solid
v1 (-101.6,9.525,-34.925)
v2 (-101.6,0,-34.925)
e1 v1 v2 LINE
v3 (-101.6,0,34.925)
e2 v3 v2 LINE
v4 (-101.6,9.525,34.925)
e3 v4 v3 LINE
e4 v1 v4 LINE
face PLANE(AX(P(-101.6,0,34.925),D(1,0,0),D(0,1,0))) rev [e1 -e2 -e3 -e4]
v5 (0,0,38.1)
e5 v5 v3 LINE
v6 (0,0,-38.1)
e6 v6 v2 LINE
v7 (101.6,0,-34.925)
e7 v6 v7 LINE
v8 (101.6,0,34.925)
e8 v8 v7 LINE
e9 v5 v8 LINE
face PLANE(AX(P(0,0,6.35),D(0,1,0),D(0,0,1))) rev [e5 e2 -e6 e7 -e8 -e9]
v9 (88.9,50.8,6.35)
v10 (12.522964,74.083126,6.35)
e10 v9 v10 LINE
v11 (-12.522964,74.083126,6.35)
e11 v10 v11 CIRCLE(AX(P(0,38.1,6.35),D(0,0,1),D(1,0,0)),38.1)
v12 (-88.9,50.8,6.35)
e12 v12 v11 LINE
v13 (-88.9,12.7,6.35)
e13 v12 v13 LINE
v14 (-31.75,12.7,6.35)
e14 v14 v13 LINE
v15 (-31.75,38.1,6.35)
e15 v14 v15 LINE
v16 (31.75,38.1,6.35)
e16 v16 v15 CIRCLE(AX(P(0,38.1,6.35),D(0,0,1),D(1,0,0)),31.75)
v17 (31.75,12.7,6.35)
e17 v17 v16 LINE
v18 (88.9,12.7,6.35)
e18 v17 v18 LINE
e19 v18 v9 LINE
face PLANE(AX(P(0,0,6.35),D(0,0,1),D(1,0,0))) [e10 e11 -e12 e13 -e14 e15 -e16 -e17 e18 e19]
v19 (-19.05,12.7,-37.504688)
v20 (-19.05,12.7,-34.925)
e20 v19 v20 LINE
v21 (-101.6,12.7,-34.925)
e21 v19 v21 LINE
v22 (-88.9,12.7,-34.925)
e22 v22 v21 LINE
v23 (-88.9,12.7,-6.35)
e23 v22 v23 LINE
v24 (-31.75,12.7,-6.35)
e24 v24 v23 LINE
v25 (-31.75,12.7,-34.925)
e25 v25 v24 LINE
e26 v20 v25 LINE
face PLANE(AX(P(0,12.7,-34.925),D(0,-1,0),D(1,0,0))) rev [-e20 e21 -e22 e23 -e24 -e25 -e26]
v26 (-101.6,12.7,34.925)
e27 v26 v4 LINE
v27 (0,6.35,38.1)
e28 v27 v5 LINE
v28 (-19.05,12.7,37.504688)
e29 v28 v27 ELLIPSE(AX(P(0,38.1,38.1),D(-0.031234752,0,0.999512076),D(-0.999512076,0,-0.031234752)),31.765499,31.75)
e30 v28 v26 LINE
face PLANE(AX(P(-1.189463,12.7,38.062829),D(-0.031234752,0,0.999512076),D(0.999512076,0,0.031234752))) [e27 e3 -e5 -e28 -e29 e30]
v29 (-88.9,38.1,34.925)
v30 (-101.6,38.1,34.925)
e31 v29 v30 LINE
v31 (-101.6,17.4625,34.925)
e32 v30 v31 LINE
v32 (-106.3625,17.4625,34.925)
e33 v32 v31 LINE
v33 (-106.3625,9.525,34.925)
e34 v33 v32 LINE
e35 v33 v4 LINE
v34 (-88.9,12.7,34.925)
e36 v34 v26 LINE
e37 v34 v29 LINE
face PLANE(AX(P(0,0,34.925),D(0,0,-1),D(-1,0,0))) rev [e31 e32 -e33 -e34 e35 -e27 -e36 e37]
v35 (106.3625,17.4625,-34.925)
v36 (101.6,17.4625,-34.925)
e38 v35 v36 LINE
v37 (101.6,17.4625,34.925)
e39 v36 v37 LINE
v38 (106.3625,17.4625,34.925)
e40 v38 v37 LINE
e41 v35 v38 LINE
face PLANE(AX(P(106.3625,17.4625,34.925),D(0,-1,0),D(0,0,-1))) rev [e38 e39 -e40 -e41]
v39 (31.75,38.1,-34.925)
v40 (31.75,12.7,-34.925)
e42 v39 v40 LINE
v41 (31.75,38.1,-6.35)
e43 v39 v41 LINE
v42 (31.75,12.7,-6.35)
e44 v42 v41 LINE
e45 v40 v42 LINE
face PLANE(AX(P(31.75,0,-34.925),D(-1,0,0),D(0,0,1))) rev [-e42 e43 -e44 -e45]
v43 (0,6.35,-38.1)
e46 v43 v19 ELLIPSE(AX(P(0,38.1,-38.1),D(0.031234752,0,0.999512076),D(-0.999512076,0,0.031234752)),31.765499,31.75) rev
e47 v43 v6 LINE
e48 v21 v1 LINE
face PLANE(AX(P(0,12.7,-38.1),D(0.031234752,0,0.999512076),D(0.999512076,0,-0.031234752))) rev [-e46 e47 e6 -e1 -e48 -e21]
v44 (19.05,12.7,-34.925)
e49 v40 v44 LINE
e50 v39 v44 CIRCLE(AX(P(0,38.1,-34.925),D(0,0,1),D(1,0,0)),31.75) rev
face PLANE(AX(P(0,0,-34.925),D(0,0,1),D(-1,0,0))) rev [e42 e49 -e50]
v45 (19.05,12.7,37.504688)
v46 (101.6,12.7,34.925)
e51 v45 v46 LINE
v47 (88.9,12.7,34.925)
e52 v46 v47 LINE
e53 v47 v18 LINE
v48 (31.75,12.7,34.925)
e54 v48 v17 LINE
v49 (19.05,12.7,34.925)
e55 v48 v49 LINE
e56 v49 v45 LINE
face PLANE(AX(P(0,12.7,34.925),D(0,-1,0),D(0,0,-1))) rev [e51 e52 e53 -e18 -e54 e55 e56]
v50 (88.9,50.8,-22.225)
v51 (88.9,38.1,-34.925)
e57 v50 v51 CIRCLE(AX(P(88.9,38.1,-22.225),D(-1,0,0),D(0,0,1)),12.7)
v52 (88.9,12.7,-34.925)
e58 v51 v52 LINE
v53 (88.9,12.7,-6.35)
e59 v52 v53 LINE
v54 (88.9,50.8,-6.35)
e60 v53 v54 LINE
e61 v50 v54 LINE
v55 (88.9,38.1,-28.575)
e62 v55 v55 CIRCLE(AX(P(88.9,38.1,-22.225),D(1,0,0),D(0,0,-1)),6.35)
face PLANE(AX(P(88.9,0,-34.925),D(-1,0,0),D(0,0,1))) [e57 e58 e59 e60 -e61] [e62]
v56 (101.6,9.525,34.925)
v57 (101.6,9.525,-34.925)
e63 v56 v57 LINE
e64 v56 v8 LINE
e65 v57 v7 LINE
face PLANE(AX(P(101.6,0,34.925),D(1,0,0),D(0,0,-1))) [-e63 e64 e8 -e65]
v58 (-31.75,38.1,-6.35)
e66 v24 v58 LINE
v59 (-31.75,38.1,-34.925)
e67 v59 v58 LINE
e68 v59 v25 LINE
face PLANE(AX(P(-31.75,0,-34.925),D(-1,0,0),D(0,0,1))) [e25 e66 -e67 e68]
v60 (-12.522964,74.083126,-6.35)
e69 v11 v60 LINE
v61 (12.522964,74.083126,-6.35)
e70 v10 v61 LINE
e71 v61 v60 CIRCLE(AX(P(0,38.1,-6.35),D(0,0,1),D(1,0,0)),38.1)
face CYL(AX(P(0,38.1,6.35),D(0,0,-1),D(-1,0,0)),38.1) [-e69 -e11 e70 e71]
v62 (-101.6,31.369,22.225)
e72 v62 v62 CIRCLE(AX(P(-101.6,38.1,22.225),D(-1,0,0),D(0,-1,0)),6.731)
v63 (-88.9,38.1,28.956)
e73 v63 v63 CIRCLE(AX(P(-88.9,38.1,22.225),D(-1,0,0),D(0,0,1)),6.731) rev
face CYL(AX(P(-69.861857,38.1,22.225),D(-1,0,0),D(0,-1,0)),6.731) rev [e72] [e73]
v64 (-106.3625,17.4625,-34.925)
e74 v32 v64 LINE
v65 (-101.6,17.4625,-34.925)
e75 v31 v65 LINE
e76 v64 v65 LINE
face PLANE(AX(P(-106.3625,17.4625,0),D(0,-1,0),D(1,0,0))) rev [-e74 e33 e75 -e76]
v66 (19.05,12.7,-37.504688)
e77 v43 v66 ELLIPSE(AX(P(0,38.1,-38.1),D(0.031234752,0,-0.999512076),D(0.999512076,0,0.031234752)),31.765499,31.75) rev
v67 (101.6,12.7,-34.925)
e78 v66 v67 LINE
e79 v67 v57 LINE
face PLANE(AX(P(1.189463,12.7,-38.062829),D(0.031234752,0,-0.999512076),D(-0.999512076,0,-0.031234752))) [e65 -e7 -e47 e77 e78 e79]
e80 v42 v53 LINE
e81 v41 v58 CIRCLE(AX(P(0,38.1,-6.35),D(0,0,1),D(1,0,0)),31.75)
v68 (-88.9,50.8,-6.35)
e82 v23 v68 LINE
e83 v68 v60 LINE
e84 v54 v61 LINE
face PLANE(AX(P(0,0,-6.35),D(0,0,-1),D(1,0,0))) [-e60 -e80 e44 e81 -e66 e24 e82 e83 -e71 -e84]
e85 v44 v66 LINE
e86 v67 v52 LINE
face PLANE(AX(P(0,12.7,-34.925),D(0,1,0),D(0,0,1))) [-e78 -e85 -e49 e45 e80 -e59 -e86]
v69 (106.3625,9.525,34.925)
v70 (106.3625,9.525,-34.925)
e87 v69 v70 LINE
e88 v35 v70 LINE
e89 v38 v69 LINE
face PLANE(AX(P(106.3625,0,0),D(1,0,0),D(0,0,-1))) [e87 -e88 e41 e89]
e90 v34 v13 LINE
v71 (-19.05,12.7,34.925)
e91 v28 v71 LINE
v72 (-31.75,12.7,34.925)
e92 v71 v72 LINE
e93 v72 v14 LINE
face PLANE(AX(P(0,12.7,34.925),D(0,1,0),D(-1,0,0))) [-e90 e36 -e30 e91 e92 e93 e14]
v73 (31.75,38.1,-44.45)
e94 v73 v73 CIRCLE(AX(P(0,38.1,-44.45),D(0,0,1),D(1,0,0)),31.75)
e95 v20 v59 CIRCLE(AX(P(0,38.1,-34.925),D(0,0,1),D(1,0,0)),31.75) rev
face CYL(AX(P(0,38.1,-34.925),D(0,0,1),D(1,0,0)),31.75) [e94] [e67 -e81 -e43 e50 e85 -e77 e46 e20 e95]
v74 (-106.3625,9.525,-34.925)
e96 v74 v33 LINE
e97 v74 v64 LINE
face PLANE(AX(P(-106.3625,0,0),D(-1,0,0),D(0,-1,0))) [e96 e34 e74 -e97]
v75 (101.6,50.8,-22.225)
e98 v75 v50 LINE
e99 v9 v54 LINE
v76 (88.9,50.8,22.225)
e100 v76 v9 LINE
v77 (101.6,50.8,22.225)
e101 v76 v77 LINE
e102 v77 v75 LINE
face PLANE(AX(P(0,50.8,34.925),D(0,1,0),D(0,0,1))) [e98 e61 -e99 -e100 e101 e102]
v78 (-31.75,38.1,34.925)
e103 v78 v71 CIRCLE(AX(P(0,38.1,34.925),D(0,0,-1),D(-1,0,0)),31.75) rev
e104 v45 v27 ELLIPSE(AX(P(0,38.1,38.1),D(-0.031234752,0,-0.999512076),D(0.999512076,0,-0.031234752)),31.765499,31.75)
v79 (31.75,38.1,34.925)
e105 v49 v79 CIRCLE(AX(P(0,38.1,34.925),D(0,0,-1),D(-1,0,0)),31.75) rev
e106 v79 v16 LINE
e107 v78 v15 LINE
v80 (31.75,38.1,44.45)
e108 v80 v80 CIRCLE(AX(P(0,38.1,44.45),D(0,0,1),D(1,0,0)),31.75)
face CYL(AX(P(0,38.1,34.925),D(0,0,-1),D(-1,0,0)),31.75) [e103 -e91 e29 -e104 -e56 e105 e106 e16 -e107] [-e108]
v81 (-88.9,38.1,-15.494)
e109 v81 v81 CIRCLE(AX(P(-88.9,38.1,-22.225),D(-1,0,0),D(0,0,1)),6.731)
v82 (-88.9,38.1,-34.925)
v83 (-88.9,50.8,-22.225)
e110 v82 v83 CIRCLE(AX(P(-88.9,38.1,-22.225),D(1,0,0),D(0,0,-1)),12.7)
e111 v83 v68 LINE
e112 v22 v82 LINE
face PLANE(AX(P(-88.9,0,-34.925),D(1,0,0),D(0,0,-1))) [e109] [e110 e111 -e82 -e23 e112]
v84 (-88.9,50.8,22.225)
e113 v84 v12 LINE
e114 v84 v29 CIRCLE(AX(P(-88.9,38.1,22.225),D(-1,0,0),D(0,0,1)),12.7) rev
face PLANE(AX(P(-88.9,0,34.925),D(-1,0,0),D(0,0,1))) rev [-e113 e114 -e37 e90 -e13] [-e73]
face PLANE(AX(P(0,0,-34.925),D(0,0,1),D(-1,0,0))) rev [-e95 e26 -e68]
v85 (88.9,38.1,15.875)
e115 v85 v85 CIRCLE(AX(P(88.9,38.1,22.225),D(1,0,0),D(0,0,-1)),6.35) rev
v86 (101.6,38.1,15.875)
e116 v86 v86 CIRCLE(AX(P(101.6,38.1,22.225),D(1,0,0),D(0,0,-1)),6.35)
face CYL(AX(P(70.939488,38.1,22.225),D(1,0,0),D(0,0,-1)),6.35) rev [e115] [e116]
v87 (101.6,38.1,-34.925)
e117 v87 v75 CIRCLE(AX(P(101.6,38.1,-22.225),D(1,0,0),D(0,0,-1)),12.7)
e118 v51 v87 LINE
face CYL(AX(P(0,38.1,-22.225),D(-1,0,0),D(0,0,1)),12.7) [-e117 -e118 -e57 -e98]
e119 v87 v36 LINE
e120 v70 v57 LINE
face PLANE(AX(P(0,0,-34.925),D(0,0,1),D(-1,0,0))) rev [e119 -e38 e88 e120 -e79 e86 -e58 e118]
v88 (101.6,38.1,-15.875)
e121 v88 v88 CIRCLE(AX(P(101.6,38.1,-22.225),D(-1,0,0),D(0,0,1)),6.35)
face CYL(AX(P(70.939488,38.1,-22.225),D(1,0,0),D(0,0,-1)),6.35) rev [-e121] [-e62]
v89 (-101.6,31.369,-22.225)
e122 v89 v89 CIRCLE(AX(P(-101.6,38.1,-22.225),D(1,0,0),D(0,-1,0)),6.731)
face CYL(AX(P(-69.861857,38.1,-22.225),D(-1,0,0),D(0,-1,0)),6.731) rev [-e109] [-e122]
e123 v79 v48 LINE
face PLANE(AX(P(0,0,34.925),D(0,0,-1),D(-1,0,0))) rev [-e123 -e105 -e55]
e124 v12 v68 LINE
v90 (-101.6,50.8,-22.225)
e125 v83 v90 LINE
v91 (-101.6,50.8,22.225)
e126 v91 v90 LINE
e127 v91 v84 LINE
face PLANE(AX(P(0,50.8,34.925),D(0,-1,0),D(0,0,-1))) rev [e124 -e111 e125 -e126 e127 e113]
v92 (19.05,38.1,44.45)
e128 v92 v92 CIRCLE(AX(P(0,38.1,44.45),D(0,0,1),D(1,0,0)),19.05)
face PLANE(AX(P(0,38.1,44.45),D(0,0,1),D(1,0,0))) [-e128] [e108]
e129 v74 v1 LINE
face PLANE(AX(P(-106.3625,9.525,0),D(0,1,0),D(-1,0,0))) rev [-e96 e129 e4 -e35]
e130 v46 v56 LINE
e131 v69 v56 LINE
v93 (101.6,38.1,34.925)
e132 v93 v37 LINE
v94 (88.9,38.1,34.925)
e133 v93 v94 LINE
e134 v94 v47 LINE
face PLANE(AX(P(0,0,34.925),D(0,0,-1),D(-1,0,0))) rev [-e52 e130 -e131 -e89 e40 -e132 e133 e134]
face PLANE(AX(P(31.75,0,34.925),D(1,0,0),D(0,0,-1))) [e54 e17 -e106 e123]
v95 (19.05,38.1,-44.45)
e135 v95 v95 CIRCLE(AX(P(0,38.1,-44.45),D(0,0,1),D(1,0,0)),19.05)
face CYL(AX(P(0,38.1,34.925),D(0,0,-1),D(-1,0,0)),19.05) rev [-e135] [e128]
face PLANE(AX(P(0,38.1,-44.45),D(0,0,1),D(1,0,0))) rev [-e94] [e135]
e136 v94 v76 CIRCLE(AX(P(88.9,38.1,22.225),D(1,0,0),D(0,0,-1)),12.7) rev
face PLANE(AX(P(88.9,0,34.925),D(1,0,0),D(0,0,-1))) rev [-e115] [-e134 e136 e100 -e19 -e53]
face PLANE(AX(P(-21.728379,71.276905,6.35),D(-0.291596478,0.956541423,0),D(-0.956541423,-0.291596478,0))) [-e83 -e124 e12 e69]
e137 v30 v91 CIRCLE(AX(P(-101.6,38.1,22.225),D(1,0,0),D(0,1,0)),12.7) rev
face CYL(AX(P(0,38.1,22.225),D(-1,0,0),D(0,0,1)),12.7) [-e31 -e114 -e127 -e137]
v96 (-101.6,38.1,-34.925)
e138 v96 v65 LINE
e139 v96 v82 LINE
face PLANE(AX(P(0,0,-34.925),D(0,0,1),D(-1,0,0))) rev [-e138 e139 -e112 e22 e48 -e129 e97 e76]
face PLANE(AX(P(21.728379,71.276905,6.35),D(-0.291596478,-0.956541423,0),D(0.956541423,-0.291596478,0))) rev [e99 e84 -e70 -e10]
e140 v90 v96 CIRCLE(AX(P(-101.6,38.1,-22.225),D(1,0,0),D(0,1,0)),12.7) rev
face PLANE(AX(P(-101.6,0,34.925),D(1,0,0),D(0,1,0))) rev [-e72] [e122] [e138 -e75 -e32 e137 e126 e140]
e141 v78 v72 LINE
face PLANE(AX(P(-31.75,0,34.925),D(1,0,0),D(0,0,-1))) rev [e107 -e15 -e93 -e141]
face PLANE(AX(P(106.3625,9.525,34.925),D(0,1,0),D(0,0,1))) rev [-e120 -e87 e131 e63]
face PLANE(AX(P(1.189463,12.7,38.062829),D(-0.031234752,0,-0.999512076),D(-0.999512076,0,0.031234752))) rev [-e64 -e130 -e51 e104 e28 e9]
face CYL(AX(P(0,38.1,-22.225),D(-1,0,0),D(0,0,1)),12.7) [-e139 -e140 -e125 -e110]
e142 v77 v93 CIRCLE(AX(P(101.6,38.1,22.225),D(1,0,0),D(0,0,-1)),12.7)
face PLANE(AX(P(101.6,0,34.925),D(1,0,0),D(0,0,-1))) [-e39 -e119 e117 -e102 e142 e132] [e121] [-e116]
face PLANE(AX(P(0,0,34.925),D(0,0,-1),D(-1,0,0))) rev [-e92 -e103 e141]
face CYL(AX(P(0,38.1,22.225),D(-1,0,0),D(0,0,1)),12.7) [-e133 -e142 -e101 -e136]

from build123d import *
from build123d.topology import SkipClean

# Parameters (mm, degrees)
BOSS_EXTRUDE4_DEPTH     = 6.35
BOSS_EXTRUDE5_START     = -34.925
BOSS_EXTRUDE5_OUTLINE_R = 19.05
BOSS_EXTRUDE5_DEPTH     = 34.925
SKETCH5_R               = 6.35
CUT_EXTRUDE1_DEPTH      = 12.7
SKETCH6_R               = 6.731
CUT_EXTRUDE2_DEPTH      = 12.7
SKETCH8_W               = 34.925
SKETCH8_H               = 7.9375
BOSS_EXTRUDE6_DEPTH     = 4.7625
SKETCH9_W               = 34.925
SKETCH9_H               = 7.9375
BOSS_EXTRUDE7_DEPTH     = 4.7625
FILLET1_R               = 12.7
FILLET1_OF_MIRROR1_R    = 12.7
SKETCH10_R              = 31.75
SKETCH10_R_2            = 19.05
BOSS_EXTRUDE8_DEPTH     = 44.45
BOSS_EXTRUDE9_DEPTH     = 12.7


# Read off the part's stored shape, not the designer's step: Boss-Extrude5
with BuildPart() as part:
    # Sketch2 → Boss-Extrude4 (new body)
    with BuildSketch(Plane.XY):
        with BuildLine():
            ThreePointArc((-12.522963776, 74.083126299), (-37.56705413, 31.749689456), (0, 0))
            Line((0, 0), (0, 6.35))
            ThreePointArc((0, 6.35), (-31.75, 38.1), (0, 69.85))
            Line((0, 69.85), (0, 76.2))
            ThreePointArc((0, 76.2), (-6.350310544, 75.66705413), (-12.522963776, 74.083126299))
        make_face()
        with BuildLine():
            Line((0, 6.35), (0, 0))
            ThreePointArc((0, 0), (26.940768363, 11.159231637), (38.1, 38.1))
            ThreePointArc((38.1, 38.1), (31.054266373, 60.173571076), (12.522963776, 74.083126299))
            ThreePointArc((12.522963776, 74.083126299), (6.350310544, 75.66705413), (0, 76.2))
            Line((0, 76.2), (0, 69.85))
            ThreePointArc((0, 69.85), (22.450640303, 60.550640303), (31.75, 38.1))
            ThreePointArc((31.75, 38.1), (22.450640303, 15.649359697), (0, 6.35))
        make_face()
        with BuildLine():
            ThreePointArc((38.1, 38.1), (26.940768363, 11.159231637), (0, 0))
            Line((0, 0), (88.9, 0))
            Line((88.9, 0), (88.9, 50.8))
            Line((88.9, 50.8), (12.522963776, 74.083126299))
            ThreePointArc((12.522963776, 74.083126299), (31.054266373, 60.173571076), (38.1, 38.1))
        make_face()
        with BuildLine():
            Line((-88.9, 0), (0, 0))
            ThreePointArc((0, 0), (-37.56705413, 31.749689456), (-12.522963776, 74.083126299))
            Line((-12.522963776, 74.083126299), (-88.9, 50.8))
            Line((-88.9, 50.8), (-88.9, 0))
        make_face()
    boss_extrude4 = extrude(amount=BOSS_EXTRUDE4_DEPTH)

    # Boss-Extrude5 outline → Boss-Extrude5 (add)
    with BuildSketch(Plane(origin=(0, 0, 0), x_dir=(-1, 0, 0), z_dir=(0, 0, -1)).offset(BOSS_EXTRUDE5_START)):
        with BuildLine():
            Line((101.6, 0), (101.6, 50.8))
            Line((101.6, 50.8), (88.9, 50.8))
            Line((88.9, 50.8), (88.9, 12.7))
            Line((88.9, 12.7), (31.75, 12.7))
            Line((31.75, 12.7), (31.75, 38.1))
            ThreePointArc((31.75, 38.1), (0, 69.85), (-31.75, 38.1))
            Line((-31.75, 38.1), (-31.75, 12.7))
            Line((-31.75, 12.7), (-88.9, 12.7))
            Line((-88.9, 12.7), (-88.9, 50.8))
            Line((-88.9, 50.8), (-101.6, 50.8))
            Line((-101.6, 50.8), (-101.6, 0))
            Line((-101.6, 0), (101.6, 0))
        make_face()
        with Locations((0, 38.1)):
            Circle(BOSS_EXTRUDE5_OUTLINE_R, mode=Mode.SUBTRACT)
    boss_extrude5 = extrude(amount=BOSS_EXTRUDE5_DEPTH)

    # Sketch5 → Cut-Extrude1 (cut)
    with BuildSketch(Plane(origin=(101.6, 0, 0), x_dir=(0, 0, -1), z_dir=(1, 0, 0))):
        with Locations((-22.225, 38.1)):
            Circle(SKETCH5_R)
    cut_extrude1 = extrude(amount=-CUT_EXTRUDE1_DEPTH, mode=Mode.SUBTRACT)

    # Sketch6 → Cut-Extrude2 (cut)
    with BuildSketch(Plane.ZY.offset(101.6)):
        with Locations(Location((22.225, 38.1, 0), (0, 0, 270))):
            Circle(SKETCH6_R)
    cut_extrude2 = extrude(amount=-CUT_EXTRUDE2_DEPTH, mode=Mode.SUBTRACT)

    # Sketch8 → Boss-Extrude6 (add)
    with BuildSketch(Plane(origin=(101.6, 0, 0), x_dir=(0, 0, -1), z_dir=(1, 0, 0))):
        with Locations((-17.4625, 13.49375)):
            Rectangle(SKETCH8_W, SKETCH8_H)
    boss_extrude6 = extrude(amount=BOSS_EXTRUDE6_DEPTH)

    # Sketch9 → Boss-Extrude7 (add)
    with BuildSketch(Plane.ZY.offset(101.6)):
        with Locations((17.4625, 13.49375)):
            Rectangle(SKETCH9_W, SKETCH9_H)
    boss_extrude7 = extrude(amount=BOSS_EXTRUDE7_DEPTH)

    # Fillet1
    fillet1_edges = [part.edges().sort_by_distance(p)[0] for p in [
        (95.25, 50.8, 34.925),
        (-95.25, 50.8, 34.925),
    ]]
    fillet(fillet1_edges, radius=FILLET1_R)

    # Mirror1: Boss-Extrude4, Boss-Extrude5, Cut-Extrude1, Cut-Extrude2, Boss-Extrude6, Boss-Extrude7 across plane
    add(boss_extrude4.mirror(Plane.XY))
    add(boss_extrude5.mirror(Plane.XY))
    add(cut_extrude1.mirror(Plane.XY), mode=Mode.SUBTRACT)
    add(cut_extrude2.mirror(Plane.XY), mode=Mode.SUBTRACT)
    add(boss_extrude6.mirror(Plane.XY))
    add(boss_extrude7.mirror(Plane.XY))

    # Fillet1 of Mirror1
    fillet1_of_mirror1_edges = [part.edges().sort_by_distance(p)[0] for p in [
        (95.25, 50.8, -34.925),
        (-95.25, 50.8, -34.925),
    ]]
    fillet(fillet1_of_mirror1_edges, radius=FILLET1_OF_MIRROR1_R)

    # Sketch10 → Boss-Extrude8 (add, symmetric)
    with SkipClean():  # the faces are left unmerged after this step: merging them gives an invalid solid
        with BuildSketch(Plane.XY):
            with Locations((0, 38.1)):
                Circle(SKETCH10_R)
            with Locations((0, 38.1)):
                Circle(SKETCH10_R_2, mode=Mode.SUBTRACT)
        extrude(amount=BOSS_EXTRUDE8_DEPTH, both=True)

    # Sketch11 → Boss-Extrude9 (add)
    with SkipClean():  # the faces are left unmerged after this step: merging them gives an invalid solid
        with BuildSketch(Plane.XZ):
            Polygon((101.6, 34.925), (0, 38.1), (-101.6, 34.925), align=None)
            Polygon((-101.6, -34.925), (0, -38.1), (101.6, -34.925), align=None)
        extrude(amount=-BOSS_EXTRUDE9_DEPTH)


solid = part.part
